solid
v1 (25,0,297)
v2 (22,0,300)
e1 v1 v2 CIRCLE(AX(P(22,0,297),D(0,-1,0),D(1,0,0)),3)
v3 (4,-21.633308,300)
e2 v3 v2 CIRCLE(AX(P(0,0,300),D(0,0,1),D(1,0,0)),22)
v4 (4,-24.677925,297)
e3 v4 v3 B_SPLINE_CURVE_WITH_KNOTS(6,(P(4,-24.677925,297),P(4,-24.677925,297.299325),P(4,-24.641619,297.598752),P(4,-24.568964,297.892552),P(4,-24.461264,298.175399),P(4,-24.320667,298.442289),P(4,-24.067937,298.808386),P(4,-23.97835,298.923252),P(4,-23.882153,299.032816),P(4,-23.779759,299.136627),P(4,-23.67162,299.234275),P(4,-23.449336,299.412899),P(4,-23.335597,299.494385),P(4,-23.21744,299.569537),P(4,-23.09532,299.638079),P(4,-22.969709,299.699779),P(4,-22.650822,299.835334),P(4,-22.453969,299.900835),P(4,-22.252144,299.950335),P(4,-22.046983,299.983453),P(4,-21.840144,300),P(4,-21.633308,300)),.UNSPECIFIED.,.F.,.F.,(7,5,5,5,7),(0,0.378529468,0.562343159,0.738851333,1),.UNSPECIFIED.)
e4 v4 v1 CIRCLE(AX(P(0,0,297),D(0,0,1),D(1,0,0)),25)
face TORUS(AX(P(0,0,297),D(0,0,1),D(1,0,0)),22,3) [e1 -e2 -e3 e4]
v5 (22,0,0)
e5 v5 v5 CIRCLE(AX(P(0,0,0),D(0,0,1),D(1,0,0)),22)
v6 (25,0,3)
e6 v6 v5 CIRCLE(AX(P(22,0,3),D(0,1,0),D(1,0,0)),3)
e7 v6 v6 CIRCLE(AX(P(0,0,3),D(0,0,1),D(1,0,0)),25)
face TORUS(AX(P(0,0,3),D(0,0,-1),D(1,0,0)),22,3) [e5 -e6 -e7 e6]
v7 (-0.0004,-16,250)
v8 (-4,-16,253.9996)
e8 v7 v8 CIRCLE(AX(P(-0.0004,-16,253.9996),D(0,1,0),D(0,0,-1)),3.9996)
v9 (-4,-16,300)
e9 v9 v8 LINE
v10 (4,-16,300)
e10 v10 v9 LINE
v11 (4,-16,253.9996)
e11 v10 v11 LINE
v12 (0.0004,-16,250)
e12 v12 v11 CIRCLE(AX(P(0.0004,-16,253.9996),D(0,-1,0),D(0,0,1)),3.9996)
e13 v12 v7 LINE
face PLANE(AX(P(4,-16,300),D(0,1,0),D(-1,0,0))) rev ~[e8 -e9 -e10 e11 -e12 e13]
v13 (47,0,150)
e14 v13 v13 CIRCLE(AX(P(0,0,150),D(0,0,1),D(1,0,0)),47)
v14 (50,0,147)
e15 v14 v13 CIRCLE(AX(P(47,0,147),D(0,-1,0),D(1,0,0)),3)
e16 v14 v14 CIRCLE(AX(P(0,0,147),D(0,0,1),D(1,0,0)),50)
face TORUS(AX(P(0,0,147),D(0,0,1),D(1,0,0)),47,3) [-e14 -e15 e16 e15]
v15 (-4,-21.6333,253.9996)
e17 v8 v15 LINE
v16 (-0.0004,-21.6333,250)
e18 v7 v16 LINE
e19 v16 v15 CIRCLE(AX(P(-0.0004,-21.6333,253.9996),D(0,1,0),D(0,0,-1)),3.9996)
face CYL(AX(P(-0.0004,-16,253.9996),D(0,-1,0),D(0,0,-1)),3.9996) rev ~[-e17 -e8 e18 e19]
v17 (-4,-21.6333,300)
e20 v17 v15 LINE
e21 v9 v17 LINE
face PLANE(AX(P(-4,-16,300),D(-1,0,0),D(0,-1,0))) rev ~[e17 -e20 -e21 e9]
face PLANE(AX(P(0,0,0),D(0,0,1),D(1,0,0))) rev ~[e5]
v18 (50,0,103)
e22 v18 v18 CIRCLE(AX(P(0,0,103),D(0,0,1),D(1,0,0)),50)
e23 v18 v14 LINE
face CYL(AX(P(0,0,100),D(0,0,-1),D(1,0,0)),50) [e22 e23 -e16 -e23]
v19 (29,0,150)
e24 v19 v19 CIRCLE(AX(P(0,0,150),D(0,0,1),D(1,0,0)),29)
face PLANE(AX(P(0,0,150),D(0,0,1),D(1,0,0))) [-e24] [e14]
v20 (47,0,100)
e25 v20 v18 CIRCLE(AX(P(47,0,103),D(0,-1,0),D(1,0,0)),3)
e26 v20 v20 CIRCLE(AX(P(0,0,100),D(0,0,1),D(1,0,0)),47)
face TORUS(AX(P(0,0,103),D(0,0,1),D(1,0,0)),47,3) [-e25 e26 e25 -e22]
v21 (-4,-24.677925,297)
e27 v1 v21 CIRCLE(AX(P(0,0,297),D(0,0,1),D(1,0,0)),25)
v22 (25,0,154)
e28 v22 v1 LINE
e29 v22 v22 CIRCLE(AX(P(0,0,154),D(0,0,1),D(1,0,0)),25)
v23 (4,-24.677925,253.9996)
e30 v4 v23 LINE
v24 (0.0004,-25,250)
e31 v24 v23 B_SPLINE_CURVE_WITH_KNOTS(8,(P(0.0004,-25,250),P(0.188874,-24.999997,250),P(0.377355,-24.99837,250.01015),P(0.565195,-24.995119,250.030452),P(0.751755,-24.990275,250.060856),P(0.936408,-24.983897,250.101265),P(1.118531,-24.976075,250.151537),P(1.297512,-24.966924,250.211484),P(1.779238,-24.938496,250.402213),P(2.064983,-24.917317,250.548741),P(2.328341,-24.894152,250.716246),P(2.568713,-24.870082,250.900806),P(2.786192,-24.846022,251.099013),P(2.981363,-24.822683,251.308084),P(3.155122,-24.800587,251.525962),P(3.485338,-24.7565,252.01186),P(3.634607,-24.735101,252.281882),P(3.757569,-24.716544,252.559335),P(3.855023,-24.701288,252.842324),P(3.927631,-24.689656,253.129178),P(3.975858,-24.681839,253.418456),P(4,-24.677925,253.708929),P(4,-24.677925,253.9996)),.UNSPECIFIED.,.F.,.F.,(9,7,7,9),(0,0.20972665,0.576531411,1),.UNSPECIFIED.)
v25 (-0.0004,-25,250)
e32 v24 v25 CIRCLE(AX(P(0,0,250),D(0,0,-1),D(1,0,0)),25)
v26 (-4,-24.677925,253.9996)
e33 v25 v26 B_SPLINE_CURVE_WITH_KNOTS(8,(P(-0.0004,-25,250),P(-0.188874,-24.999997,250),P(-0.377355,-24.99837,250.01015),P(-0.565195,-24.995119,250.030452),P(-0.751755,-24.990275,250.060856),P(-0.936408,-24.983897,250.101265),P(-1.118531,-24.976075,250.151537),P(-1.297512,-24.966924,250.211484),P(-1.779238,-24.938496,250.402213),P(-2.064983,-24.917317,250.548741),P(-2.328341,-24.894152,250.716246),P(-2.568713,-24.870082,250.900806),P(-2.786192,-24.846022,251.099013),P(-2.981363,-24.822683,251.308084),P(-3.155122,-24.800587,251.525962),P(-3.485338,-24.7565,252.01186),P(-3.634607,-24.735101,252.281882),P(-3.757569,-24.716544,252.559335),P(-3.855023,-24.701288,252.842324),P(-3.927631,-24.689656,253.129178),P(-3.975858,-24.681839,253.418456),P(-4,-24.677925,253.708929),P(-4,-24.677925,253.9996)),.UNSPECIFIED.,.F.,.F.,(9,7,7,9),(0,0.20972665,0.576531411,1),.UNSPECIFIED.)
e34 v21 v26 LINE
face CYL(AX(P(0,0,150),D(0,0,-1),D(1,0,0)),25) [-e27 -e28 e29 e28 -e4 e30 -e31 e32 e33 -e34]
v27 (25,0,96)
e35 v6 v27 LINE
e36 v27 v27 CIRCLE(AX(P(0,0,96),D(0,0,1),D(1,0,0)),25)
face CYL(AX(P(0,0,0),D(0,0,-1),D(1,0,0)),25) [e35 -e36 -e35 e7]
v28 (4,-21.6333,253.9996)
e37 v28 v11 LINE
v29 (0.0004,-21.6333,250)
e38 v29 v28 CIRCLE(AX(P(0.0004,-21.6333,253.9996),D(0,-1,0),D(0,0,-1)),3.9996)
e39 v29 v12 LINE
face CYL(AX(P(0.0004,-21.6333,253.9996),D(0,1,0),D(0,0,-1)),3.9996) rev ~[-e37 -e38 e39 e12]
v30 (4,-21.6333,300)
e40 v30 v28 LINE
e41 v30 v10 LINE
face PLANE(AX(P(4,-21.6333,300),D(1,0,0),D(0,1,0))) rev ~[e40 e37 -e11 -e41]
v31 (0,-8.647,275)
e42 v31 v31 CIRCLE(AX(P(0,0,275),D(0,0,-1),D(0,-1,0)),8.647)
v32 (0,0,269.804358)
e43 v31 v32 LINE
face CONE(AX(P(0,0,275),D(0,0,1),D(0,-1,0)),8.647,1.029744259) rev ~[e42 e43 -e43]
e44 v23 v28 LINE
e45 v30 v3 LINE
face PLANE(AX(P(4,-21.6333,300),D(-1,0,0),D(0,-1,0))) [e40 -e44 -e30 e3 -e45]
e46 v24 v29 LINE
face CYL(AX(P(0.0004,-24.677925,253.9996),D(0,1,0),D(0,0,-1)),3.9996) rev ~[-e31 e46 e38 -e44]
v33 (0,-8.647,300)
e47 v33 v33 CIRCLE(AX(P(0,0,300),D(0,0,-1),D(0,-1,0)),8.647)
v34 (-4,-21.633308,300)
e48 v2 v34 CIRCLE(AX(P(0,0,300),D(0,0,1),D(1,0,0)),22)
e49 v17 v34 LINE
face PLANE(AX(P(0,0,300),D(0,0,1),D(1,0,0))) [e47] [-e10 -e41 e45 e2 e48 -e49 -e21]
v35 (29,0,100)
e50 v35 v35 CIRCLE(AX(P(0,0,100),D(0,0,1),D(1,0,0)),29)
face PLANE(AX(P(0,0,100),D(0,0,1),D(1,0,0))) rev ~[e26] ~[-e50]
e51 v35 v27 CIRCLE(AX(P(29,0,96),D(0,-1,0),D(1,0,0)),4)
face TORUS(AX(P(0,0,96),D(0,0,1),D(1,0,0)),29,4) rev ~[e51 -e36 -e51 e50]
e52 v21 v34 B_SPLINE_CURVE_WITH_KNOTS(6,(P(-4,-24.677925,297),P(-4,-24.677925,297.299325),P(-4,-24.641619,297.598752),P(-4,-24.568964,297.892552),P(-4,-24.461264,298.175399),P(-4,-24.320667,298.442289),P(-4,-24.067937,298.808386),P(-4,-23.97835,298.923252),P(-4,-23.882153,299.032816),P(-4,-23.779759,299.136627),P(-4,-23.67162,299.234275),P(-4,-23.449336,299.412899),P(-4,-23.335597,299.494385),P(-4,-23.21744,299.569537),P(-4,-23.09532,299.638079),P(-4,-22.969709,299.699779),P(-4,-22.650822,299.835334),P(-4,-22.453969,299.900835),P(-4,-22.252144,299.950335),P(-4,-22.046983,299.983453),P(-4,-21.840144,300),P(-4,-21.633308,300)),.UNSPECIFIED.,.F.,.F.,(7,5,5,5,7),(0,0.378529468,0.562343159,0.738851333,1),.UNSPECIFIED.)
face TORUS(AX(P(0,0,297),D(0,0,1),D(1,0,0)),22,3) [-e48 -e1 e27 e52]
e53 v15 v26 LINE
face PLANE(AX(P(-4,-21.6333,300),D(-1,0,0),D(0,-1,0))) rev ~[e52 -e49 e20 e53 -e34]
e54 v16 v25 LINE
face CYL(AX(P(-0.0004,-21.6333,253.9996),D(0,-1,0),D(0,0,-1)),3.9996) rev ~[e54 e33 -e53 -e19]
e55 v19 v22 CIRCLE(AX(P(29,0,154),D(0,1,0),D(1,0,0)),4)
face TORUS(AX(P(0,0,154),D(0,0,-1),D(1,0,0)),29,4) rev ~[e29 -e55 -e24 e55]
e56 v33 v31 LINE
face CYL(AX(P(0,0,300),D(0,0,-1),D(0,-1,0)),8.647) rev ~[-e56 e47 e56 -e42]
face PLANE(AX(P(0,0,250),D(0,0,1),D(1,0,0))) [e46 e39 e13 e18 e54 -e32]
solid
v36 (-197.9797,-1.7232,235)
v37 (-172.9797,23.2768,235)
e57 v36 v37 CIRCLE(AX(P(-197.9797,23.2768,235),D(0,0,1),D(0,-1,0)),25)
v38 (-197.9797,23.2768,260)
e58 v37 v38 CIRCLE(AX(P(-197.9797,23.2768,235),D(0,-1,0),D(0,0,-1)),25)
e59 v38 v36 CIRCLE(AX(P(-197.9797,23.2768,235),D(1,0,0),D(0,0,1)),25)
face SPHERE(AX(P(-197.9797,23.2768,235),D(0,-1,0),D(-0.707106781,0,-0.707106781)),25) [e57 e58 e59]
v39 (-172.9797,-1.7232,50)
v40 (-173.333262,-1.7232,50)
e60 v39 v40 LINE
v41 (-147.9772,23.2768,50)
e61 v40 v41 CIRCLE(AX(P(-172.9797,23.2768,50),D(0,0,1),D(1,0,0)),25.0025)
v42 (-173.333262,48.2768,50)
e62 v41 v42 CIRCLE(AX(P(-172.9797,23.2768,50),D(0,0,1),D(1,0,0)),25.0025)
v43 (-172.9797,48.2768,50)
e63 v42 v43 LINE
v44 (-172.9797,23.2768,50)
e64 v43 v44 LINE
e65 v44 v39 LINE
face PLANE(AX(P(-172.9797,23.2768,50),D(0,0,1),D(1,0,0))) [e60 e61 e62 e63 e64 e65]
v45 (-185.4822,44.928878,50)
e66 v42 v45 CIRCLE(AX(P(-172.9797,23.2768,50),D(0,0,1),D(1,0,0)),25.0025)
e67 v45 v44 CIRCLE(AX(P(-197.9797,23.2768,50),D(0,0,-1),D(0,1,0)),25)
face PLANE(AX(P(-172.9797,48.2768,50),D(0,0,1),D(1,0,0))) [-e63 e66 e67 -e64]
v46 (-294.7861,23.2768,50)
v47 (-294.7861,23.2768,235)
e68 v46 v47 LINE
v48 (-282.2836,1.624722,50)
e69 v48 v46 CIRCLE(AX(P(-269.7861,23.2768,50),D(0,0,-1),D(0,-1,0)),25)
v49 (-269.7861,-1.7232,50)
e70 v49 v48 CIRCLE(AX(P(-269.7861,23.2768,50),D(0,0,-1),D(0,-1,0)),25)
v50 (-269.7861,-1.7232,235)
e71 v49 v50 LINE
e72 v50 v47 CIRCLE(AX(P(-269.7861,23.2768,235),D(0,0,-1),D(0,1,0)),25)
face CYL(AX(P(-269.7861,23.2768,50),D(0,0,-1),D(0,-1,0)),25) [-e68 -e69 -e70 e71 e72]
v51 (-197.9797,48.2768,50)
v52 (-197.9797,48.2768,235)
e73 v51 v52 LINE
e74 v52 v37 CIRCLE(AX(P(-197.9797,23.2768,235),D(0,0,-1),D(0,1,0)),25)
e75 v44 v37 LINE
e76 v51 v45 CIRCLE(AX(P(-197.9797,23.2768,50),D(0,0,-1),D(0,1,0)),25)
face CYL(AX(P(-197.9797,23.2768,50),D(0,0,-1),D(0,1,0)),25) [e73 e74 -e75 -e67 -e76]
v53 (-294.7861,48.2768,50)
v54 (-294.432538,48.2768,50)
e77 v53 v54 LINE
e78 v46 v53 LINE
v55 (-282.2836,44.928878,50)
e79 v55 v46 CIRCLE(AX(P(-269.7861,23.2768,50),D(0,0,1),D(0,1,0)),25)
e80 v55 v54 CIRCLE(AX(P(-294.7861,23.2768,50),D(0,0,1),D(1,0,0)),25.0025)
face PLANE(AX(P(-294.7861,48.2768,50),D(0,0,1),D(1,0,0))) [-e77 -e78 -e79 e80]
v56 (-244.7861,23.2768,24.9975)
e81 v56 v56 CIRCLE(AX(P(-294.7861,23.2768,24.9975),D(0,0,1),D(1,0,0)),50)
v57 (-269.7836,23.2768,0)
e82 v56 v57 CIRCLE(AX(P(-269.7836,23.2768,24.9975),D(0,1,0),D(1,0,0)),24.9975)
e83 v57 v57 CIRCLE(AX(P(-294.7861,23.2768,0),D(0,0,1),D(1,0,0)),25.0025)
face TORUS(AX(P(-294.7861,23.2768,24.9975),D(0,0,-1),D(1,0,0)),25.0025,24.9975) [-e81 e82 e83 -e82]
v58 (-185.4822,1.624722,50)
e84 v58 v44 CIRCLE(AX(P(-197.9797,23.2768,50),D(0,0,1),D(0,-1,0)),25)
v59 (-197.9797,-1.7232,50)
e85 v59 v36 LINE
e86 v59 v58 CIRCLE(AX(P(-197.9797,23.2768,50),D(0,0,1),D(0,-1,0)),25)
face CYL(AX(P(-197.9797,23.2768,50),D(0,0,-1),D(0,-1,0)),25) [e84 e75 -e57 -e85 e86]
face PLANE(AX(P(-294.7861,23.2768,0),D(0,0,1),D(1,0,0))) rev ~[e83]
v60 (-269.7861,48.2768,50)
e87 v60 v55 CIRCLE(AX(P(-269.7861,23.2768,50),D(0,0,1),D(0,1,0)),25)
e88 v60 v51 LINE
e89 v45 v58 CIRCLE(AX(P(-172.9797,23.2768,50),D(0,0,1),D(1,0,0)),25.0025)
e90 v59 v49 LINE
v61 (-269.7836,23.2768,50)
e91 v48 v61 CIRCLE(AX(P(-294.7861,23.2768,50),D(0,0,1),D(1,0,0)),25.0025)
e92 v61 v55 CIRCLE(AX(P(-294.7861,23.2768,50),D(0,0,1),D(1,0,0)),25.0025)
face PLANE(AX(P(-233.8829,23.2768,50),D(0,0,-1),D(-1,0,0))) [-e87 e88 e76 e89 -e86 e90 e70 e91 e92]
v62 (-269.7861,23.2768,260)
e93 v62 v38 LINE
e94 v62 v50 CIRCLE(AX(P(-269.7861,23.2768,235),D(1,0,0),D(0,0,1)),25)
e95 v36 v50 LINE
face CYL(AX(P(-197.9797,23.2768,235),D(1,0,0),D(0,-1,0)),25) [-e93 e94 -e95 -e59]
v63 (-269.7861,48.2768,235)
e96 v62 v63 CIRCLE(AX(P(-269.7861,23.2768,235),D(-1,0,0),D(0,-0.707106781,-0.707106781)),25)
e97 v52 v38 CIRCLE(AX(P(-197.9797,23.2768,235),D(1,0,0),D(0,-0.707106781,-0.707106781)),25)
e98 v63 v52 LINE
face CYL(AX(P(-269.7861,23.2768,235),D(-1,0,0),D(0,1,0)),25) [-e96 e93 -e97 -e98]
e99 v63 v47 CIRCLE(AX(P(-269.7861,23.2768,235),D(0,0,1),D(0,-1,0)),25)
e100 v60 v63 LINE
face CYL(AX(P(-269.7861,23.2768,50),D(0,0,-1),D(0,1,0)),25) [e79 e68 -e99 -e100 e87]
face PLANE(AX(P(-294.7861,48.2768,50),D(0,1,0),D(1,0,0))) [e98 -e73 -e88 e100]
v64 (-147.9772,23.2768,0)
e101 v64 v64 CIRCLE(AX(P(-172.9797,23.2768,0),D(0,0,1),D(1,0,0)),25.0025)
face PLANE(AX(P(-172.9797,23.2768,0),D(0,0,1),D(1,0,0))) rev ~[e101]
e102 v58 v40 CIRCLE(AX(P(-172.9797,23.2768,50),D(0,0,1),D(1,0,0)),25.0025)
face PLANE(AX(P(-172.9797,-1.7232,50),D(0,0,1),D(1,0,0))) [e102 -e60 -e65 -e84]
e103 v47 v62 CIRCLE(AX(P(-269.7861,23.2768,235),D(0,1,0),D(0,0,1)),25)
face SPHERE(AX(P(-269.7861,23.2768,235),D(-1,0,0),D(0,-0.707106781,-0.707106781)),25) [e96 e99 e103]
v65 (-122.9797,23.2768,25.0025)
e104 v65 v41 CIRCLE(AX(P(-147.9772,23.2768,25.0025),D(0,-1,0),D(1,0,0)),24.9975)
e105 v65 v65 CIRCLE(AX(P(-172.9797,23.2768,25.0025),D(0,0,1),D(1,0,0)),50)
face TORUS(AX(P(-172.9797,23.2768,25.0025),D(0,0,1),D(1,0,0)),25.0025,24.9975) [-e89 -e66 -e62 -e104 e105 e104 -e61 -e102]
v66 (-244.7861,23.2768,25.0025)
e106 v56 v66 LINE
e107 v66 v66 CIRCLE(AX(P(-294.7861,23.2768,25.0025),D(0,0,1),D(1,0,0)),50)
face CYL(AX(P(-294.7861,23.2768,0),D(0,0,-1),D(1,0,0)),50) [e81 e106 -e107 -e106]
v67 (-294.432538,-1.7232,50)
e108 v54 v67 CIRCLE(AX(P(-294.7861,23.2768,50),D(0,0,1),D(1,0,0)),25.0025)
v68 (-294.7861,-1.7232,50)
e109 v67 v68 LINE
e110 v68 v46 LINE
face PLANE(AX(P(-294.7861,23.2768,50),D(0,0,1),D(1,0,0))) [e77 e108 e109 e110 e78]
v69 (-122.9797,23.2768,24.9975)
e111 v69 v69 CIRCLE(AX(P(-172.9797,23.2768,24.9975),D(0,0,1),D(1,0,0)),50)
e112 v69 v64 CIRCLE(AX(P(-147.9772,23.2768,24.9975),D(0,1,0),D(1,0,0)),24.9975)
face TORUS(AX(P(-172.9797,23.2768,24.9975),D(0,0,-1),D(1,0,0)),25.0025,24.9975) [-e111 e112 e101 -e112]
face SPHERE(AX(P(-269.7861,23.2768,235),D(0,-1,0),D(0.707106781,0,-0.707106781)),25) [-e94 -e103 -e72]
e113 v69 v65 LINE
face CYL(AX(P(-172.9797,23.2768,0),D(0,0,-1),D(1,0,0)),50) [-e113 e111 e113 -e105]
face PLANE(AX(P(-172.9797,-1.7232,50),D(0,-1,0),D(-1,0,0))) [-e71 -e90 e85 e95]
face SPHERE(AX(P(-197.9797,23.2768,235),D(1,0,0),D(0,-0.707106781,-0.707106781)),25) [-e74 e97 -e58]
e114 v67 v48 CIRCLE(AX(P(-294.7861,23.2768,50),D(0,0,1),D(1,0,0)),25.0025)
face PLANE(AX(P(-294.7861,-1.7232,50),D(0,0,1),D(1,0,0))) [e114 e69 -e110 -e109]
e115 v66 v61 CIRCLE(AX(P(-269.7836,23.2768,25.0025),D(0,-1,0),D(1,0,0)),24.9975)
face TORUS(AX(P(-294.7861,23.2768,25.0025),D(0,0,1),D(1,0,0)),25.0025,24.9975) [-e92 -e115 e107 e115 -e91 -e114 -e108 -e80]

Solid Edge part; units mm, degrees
sketch "Sketch1" plane through (0, 0, 0) normal (0, 0, 1) x (1, 0, 0)
  circle A0 centre (0, 0) radius 25
  dimension "D1" = 50
extrude "Protrusion1" add sketch "Sketch1" along normal blind 100
sketch "Sketch2" plane through (0, 0, 100) normal (0, 0, 1) x (1, 0, 0)
  circle A0 centre (0, 0) radius 50
  dimension "D1" = 100
extrude "ExtrudedProtrusion_3" add sketch "Sketch2" along normal blind 50
sketch "Sketch3" plane through (0, 0, 150) normal (0, 0, 1) x (1, 0, 0)
  circle A0 centre (0, 0) radius 25
  dimension "D1" = 50
extrude "ExtrudedProtrusion_4" add sketch "Sketch3" along normal blind 150
fillet "Round_1" radius 4 1 edges at (-25, 0, 150)
fillet "Round_2" radius 4 1 edges at (-25, 0, 100)
fillet "Round_3" radius 3 4 edges at (-50, 0, 150) (-50, 0, 100) (-25, 0, 300) (-25, 0, 0)
sketch "Sketch4" plane through (0, 0, 0) normal (0, 0, 1) x (1, 0, 0)
  circle A0 centre (-294.7861, 23.2768) radius 50
  circle A1 centre (-172.9797, 23.2768) radius 50
  dimension "D1" = 100
  dimension "D2" = 100
extrude "ExtrudedProtrusion_5" add sketch "Sketch4" along normal blind 50
fillet "Round_4" radius 25 4 edges at (-344.7861, 23.2768, 50) (-222.9797, 23.2768, 50) (-344.7861, 23.2768, 0) (-222.9797, 23.2768, 0)
sketch "Sketch5" plane through (-172.9797, 23.2768, 50) normal (0, 0, 1) x (-1, 0, 0)
  line L0 (0, 25) -> (121.8064, 25)
  line L1 (121.8064, 25) -> (121.8064, -25)
  line L2 (121.8064, -25) -> (0, -25)
  line L3 (0, -25) -> (0, 25)
extrude "ExtrudedProtrusion_6" add sketch "Sketch5" along normal blind 210
fillet "Round_5" radius 25 8 edges at (-172.9797, 48.2768, 155) (-294.7861, 48.2768, 155) (-172.9797, -1.7232, 155) (-294.7861, -1.7232, 155) (-233.8829, 48.2768, 260) (-172.9797, 23.2768, 260) (-233.8829, -1.7232, 260) (-294.7861, 23.2768, 260)
hole "Hole_1" at (0, 0, 300) direction (0, 0, -1) diameter 17.294 depth 25 tip angle 118 thread major 20 thread length 20
sketch "Sketch6" plane through (0, 0, 300) normal (0, 0, 1) x (-1, 0, 0)
  line L0 (-4, 21.6333) -> (-4, 16)
  line L1 (-4, 16) -> (4, 16)
  line L2 (4, 16) -> (4, 21.6333)
  dimension "D1" = 8
  dimension "D2" = 16
  dimension "D3" = 4
extrude "ExtrudedCutout_3" cut sketch "Sketch6" against normal blind 50 material side at (3.95, -18.8166, 300)
fillet "Round_8" radius 4 2 edges at (-4, -20.339, 250) (4, -20.339, 250)
